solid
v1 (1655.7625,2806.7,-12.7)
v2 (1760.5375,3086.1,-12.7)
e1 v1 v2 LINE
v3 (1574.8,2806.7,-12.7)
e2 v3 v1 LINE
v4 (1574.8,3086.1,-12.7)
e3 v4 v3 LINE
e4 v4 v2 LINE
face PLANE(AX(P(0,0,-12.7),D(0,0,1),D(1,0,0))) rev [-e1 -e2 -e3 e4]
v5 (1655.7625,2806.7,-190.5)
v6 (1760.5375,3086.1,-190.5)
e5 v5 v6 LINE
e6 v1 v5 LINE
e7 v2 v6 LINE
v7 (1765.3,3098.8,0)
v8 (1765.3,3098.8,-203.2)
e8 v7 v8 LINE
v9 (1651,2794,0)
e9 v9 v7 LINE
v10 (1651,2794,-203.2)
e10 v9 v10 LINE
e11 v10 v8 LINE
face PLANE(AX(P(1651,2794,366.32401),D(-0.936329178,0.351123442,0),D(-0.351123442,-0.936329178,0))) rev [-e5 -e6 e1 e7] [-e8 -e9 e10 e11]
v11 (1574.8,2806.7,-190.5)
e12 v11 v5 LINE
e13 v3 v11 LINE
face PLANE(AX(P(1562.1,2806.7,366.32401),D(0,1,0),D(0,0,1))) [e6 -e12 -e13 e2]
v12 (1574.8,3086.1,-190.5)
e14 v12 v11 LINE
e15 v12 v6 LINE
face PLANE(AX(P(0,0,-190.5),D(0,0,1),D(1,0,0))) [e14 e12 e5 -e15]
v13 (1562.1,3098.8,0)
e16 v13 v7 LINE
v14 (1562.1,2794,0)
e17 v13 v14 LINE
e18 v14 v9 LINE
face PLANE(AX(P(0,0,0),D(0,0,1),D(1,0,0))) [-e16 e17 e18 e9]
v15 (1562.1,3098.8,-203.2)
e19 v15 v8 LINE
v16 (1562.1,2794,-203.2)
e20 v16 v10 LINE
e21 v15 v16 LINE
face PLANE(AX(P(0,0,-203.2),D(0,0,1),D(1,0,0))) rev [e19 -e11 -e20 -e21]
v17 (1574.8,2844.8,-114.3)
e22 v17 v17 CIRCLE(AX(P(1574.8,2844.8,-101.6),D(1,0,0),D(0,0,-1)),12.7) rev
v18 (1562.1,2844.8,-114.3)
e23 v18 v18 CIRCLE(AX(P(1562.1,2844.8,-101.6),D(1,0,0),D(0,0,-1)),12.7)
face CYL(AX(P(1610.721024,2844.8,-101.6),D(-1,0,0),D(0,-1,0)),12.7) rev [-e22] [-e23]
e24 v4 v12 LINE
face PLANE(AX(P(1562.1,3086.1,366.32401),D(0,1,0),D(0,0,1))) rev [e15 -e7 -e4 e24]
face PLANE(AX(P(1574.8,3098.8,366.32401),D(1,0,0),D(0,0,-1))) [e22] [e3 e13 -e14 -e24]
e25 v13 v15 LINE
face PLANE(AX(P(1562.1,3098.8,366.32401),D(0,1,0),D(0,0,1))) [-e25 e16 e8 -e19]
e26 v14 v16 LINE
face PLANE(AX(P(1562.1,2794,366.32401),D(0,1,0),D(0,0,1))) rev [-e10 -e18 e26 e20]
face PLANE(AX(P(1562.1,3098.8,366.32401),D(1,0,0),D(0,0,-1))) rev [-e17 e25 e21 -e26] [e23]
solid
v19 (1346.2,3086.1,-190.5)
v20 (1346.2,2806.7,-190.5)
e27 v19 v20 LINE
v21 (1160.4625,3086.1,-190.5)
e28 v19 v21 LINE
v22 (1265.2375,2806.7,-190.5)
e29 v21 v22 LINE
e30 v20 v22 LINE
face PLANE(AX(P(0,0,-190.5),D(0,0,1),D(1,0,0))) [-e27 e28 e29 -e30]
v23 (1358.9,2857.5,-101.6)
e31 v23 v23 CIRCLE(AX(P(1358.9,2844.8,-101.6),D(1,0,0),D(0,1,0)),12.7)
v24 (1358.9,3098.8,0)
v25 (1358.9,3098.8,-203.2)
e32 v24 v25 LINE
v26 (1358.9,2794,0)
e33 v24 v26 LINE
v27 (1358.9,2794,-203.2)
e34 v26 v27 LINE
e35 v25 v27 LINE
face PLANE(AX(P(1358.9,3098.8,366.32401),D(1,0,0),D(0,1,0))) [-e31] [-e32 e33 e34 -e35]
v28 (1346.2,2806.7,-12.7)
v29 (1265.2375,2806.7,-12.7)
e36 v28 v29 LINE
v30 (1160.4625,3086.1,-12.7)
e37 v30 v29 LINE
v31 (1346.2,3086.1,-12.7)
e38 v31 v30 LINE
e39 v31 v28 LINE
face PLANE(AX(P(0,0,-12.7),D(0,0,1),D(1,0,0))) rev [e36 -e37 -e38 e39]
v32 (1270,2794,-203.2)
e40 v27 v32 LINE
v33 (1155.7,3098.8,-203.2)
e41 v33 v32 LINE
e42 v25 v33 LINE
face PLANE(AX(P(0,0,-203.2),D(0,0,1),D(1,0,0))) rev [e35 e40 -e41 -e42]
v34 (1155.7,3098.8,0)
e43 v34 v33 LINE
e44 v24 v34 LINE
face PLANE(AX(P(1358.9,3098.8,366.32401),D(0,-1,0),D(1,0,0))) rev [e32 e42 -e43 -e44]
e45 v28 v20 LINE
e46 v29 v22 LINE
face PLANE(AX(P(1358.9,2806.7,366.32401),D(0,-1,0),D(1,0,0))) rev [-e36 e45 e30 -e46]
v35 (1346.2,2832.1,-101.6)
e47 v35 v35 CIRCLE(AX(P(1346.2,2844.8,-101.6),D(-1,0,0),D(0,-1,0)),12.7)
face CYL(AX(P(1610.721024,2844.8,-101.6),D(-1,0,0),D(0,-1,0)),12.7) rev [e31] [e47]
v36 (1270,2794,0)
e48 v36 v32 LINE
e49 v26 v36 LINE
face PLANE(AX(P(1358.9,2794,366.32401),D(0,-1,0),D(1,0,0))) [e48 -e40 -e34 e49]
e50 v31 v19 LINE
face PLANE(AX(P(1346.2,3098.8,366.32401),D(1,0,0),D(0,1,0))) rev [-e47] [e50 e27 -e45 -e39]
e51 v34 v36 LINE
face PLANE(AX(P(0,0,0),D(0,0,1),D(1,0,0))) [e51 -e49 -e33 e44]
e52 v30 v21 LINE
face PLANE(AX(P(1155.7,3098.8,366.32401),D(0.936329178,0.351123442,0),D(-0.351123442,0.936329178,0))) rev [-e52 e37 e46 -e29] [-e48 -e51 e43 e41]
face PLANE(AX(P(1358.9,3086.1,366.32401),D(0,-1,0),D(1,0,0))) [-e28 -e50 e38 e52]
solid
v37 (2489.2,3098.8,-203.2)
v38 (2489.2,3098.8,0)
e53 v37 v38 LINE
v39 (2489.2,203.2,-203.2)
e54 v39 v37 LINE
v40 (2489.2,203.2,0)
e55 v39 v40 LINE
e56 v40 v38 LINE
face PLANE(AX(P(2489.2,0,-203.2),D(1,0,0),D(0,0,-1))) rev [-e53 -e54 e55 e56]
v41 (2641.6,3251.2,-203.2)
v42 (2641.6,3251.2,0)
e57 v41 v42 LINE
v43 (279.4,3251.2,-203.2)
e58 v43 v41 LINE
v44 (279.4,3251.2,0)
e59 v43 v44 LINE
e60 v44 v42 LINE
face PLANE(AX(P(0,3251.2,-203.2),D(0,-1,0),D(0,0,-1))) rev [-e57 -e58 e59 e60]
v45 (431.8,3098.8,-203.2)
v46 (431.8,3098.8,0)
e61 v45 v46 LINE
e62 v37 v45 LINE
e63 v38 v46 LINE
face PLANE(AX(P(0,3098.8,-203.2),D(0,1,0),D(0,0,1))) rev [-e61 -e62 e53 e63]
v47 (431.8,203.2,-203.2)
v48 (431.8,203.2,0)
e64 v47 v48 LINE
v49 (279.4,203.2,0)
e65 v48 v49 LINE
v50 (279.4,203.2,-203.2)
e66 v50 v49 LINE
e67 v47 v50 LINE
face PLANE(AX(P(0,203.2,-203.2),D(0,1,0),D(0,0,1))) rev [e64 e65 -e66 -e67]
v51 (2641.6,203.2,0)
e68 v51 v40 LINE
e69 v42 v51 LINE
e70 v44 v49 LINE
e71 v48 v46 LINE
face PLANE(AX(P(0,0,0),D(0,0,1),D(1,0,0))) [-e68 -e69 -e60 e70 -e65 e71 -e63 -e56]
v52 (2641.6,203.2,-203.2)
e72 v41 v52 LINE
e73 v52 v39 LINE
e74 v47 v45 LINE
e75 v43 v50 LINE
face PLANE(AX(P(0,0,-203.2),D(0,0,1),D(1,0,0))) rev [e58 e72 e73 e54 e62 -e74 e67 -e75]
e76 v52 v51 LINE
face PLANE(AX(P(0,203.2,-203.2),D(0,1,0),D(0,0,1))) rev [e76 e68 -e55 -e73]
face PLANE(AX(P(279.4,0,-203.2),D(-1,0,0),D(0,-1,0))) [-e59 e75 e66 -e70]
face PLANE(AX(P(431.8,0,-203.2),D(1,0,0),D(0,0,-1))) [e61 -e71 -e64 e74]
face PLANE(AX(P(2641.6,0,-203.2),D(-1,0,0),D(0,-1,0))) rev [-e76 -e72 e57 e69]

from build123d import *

# Parameters (mm, degrees)
STOCK_HULL_1_START       = 203.2
STOCK_HULL_1_OUTLINE_W   = 152.4
STOCK_HULL_1_OUTLINE_H   = 203.2
STOCK_HULL_1_DEPTH       = 3048
STOCK_HULL_1_START_2     = 3098.8
STOCK_HULL_1_2_OUTLINE_W = 2057.4
STOCK_HULL_1_2_OUTLINE_H = 203.2
STOCK_HULL_1_2_DEPTH     = 152.4
BOSS_EXTRUDE1_DEPTH      = 203.2
BOSS_EXTRUDE1_2_DEPTH    = 203.2
SHELL1_T                 = -12.7
SHELL2_T                 = -12.7
CUT_EXTRUDE1_START       = -228.6
SKETCH4_R                = 12.7
CUT_EXTRUDE1_DEPTH       = 228.6


# Read off the part's stored shape, not the designer's step: Stock-Hull-1
with BuildPart() as part:
    # Stock-Hull-1 outline → Stock-Hull-1 (new body)
    with BuildSketch(Plane(origin=(0, 0, 0), x_dir=(1, 0, 0), z_dir=(0, 1, 0)).offset(STOCK_HULL_1_START)):
        with Locations((355.6, 101.6)):
            Rectangle(STOCK_HULL_1_OUTLINE_W, STOCK_HULL_1_OUTLINE_H)
        with Locations((2565.4, 101.6)):
            Rectangle(STOCK_HULL_1_OUTLINE_W, STOCK_HULL_1_OUTLINE_H)
    extrude(amount=STOCK_HULL_1_DEPTH)

    # Stock-Hull-1 2 outline → Stock-Hull-1 2 (add)
    with BuildSketch(Plane(origin=(0, 0, 0), x_dir=(1, 0, 0), z_dir=(0, 1, 0)).offset(STOCK_HULL_1_START_2)):
        with Locations((1460.5, 101.6)):
            Rectangle(STOCK_HULL_1_2_OUTLINE_W, STOCK_HULL_1_2_OUTLINE_H)
    extrude(amount=STOCK_HULL_1_2_DEPTH)


with BuildPart() as body_2:
    # Sketch1 → Boss-Extrude1 (new body)
    with BuildSketch(Plane(origin=(0, 0, -203.2), x_dir=(-1, 0, 0), z_dir=(0, 0, -1))):
        Polygon((-1562.1, 3098.8), (-1562.1, 2794), (-1651, 2794), (-1765.3, 3098.8), align=None)
    extrude(amount=-BOSS_EXTRUDE1_DEPTH)

    # Shell1
    shell1_openings = [body_2.faces().sort_by_distance(p)[0] for p in [
        (1708.15, 2946.4, -101.6),
    ]]
    offset(amount=SHELL1_T, openings=shell1_openings, kind=Kind.INTERSECTION)


with BuildPart() as body_3:
    # Sketch1 → Boss-Extrude1 2 (new body)
    with BuildSketch(Plane(origin=(0, 0, -203.2), x_dir=(-1, 0, 0), z_dir=(0, 0, -1))):
        Polygon((-1358.9, 3098.8), (-1358.9, 2794), (-1270, 2794), (-1155.7, 3098.8), align=None)
    extrude(amount=-BOSS_EXTRUDE1_2_DEPTH)

    # Shell2
    shell2_openings = [body_3.faces().sort_by_distance(p)[0] for p in [
        (1212.85, 2946.4, -101.6),
    ]]
    offset(amount=SHELL2_T, openings=shell2_openings, kind=Kind.INTERSECTION)


with BuildPart() as cut_extrude1_tool:
    # Sketch4 → Cut-Extrude1 (new body)
    with BuildSketch(Plane.ZY.offset(-1346.2).offset(CUT_EXTRUDE1_START)):
        with Locations(Location((-101.6, 2844.8, 0), (0, 0, 270))):
            Circle(SKETCH4_R)
    extrude(amount=CUT_EXTRUDE1_DEPTH)


with BuildPart() as body_2_1:
    add(body_2.part)

    # Cut-Extrude1: cut by cut_extrude1_tool
    add(cut_extrude1_tool.part, mode=Mode.SUBTRACT)


with BuildPart() as body_3_1:
    add(body_3.part)

    # Cut-Extrude1: cut by cut_extrude1_tool
    add(cut_extrude1_tool.part, mode=Mode.SUBTRACT)


solid = Compound([part.part, body_2_1.part, body_3_1.part])
